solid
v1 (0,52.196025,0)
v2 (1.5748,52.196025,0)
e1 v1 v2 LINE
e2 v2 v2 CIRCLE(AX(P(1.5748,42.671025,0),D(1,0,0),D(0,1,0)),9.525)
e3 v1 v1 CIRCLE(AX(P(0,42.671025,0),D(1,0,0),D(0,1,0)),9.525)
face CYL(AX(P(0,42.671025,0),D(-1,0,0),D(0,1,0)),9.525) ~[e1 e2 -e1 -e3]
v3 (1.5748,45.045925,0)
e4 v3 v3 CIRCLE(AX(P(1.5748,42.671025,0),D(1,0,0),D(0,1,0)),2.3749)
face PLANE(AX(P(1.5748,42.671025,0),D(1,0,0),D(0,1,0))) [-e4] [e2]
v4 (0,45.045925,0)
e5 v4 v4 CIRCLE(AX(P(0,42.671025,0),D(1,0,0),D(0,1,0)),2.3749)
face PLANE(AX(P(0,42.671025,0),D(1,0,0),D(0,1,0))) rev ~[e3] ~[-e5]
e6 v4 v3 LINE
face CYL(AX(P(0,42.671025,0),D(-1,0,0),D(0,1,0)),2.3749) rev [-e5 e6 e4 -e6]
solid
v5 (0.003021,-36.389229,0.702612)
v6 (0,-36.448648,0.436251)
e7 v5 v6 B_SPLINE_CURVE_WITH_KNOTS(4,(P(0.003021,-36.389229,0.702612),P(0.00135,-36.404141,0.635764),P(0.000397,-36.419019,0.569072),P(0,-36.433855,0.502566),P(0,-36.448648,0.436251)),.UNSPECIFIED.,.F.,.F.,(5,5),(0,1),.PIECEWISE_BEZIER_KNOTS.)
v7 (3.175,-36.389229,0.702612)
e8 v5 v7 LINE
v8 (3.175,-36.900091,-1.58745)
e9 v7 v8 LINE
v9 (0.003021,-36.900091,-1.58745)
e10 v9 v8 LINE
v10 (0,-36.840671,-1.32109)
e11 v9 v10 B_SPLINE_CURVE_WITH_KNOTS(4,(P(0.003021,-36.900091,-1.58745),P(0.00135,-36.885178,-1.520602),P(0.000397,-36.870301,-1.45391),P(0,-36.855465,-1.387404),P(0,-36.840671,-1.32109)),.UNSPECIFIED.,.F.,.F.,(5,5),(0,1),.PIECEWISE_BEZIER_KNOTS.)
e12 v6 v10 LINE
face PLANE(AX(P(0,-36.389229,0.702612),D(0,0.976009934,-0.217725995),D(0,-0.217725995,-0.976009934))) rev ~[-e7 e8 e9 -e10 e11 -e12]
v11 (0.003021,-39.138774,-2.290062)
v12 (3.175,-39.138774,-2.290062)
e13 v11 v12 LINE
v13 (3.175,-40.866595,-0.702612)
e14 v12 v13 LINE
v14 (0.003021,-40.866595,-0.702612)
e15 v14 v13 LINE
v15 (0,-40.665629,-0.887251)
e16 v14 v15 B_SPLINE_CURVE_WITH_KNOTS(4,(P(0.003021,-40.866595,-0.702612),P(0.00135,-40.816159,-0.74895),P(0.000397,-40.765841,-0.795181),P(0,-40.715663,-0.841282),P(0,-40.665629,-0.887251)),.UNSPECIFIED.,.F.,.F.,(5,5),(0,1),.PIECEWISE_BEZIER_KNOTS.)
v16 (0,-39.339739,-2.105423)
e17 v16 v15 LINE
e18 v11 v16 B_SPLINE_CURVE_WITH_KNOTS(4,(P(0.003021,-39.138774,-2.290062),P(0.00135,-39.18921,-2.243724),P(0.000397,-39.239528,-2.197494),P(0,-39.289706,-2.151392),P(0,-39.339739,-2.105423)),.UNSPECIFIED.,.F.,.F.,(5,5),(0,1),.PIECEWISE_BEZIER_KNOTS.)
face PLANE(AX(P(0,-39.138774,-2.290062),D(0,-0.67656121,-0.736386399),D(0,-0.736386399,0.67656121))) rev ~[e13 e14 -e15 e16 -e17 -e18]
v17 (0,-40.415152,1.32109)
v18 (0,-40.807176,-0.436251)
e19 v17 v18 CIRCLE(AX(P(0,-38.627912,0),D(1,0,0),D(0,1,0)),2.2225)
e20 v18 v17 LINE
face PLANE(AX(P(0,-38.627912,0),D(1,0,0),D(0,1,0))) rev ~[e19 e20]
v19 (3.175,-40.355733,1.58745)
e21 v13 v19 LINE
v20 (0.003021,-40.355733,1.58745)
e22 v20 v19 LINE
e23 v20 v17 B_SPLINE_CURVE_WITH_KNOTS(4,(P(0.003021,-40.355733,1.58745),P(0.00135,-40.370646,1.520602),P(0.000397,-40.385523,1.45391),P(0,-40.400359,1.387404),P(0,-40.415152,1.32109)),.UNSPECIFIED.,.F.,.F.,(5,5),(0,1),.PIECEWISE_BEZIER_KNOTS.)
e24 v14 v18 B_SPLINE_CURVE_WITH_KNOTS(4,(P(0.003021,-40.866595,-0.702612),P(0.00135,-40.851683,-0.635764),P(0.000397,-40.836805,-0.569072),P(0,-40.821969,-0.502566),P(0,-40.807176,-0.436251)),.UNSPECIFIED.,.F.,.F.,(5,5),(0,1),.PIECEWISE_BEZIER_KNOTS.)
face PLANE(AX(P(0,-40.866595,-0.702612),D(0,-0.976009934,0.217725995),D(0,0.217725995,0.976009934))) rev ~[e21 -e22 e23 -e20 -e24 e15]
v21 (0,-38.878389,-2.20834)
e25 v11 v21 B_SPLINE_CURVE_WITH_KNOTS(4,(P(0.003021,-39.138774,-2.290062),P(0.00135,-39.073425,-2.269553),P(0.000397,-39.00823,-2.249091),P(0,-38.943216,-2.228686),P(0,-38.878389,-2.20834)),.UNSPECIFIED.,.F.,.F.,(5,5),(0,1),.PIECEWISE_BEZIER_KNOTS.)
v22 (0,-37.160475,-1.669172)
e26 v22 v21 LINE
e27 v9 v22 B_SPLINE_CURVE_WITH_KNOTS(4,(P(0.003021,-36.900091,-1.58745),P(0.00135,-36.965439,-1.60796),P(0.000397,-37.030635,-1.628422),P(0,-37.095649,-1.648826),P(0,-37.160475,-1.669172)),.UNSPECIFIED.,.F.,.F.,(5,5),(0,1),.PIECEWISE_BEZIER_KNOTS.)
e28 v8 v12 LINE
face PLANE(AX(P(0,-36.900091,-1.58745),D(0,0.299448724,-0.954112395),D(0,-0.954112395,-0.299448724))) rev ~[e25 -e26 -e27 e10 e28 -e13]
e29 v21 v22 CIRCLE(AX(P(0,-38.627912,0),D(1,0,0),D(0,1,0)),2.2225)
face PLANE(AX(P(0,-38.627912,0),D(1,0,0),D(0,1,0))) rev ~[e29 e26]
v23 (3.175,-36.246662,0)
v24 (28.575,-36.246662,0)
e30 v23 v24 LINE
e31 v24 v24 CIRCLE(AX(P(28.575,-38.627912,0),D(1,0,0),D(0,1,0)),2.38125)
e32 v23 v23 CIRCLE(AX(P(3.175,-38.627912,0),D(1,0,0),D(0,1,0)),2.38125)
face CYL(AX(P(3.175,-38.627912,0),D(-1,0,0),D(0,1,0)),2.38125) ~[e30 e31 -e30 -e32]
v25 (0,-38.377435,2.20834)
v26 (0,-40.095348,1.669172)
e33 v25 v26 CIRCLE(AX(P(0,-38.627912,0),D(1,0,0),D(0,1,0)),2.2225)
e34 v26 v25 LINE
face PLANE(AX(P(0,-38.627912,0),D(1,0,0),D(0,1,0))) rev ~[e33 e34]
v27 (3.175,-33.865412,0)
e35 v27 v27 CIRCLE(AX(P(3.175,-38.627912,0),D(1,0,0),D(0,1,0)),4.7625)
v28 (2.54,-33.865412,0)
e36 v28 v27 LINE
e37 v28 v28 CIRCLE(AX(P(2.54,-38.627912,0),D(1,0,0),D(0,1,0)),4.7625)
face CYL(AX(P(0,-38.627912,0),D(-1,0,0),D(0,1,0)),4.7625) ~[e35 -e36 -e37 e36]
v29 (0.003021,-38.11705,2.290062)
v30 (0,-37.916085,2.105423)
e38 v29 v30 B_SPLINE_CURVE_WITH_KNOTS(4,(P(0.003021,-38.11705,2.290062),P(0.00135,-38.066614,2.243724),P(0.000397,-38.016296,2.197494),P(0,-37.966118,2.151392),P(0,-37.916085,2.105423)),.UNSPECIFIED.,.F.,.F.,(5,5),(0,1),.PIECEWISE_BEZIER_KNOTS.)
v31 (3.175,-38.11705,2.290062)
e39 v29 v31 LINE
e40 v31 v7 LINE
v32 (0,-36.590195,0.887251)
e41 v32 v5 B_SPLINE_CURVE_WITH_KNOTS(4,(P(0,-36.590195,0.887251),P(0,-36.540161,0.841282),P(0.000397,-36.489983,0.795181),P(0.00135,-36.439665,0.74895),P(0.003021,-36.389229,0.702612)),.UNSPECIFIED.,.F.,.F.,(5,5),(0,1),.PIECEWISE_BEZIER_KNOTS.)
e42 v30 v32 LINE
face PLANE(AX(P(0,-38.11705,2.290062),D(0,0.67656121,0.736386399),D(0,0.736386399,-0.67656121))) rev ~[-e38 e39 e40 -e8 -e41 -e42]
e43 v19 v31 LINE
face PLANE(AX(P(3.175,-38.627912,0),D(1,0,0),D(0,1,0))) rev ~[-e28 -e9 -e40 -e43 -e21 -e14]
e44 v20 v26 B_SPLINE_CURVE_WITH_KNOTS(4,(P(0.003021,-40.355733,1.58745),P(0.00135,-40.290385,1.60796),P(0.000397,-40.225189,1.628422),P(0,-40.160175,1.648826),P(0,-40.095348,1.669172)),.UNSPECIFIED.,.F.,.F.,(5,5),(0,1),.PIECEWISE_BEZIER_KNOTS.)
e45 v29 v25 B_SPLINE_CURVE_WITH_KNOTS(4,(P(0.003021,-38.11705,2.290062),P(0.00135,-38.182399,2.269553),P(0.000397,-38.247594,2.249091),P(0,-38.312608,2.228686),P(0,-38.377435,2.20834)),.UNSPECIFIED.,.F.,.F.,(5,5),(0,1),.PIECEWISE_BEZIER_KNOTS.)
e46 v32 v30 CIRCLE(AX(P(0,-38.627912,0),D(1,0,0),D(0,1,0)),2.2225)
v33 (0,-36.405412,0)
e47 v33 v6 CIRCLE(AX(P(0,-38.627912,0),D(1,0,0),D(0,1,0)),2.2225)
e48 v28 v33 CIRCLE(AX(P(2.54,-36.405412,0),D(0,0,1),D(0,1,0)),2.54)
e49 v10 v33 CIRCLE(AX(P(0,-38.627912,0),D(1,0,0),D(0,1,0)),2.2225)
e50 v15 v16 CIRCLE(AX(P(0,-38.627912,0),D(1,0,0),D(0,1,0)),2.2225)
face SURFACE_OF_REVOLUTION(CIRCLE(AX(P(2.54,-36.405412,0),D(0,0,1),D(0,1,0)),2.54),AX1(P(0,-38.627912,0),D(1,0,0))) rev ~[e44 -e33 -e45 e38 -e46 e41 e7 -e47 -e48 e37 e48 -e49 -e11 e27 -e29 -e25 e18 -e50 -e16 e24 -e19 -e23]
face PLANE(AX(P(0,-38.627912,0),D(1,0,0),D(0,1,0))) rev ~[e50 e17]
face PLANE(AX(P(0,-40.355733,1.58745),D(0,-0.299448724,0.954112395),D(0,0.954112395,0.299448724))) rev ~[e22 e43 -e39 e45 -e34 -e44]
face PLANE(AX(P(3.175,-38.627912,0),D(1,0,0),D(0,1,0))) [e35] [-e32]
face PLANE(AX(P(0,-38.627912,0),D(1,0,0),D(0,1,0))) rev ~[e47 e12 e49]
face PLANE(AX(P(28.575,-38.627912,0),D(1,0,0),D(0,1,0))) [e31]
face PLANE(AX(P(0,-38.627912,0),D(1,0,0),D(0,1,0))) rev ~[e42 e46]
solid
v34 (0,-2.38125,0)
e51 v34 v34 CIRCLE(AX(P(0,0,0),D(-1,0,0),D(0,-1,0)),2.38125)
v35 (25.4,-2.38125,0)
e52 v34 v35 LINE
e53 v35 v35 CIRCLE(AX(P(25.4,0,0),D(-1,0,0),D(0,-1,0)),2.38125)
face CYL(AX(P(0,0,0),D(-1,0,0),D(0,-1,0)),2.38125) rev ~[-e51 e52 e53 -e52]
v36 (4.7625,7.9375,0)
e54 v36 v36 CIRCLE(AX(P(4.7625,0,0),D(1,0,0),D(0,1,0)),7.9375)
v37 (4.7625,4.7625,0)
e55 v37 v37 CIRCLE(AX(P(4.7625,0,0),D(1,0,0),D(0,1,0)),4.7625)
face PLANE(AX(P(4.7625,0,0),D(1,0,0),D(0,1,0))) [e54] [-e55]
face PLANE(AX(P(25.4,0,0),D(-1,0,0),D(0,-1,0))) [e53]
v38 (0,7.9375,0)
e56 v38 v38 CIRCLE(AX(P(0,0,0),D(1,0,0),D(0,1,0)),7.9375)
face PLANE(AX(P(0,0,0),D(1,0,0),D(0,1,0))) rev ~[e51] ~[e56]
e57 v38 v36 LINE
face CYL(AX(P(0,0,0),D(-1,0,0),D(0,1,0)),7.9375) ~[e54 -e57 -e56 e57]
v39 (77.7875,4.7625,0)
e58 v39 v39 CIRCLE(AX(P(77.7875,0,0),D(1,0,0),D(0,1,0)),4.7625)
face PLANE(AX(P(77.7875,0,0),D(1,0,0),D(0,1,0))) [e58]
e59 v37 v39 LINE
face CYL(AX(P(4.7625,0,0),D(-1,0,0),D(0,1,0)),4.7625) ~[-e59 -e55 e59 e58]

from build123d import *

# Parameters (mm, degrees)
F0_R      = 7.9375
F1_DEPTH  = 4.7625
F2_R      = 4.7625
F3_DEPTH  = 73.025
F4_R      = 2.38125
F5_DEPTH  = 25.4
F6_R      = 9.525
F6_R_2    = 2.3749
F7_DEPTH  = 1.5748
F8_R      = 4.7625
F9_DEPTH  = 3.175
F10_R     = 2.38125
F11_DEPTH = 25.4


# Not quite as in the source:
# - a fillet or chamfer that OpenCascade refuses, or shapes differently, is made with other operations: its cross-section is extruded or revolved along the edge and cut away or added


with BuildPart() as f1:
    # F0 (on Right) → F1 (new body)
    with BuildSketch(Plane.YZ):
        Circle(F0_R)
    extrude(amount=F1_DEPTH)

    # F2 (on face) → F3 (join)
    with BuildSketch(Plane.YZ.offset(4.7625)):
        Circle(F2_R)
    extrude(amount=F3_DEPTH)

    # F4 (on face) → F5 (cut)
    with BuildSketch(Plane(origin=(0, 0, 0), x_dir=(0, -1, 0), z_dir=(-1, 0, 0))):
        Circle(F4_R)
    extrude(amount=-F5_DEPTH, mode=Mode.SUBTRACT)


with BuildPart() as f7:
    # F6 (on Right) → F7 (new body)
    with BuildSketch(Plane.YZ):
        with Locations((42.671024815, 0)):
            Circle(F6_R)
        with Locations((42.671024815, 0)):
            Circle(F6_R_2, mode=Mode.SUBTRACT)
    extrude(amount=F7_DEPTH)


with BuildPart() as f9:
    # F8 (on Right) → F9 (new body)
    with BuildSketch(Plane.YZ):
        with Locations((-38.6279119517, 0)):
            Circle(F8_R)
        Polygon((-36.9000906235, -1.5874504059), (-39.1387736664, -2.2900623664), (-40.8665949945, -0.7026119604), (-40.3557332798, 1.5874504059), (-38.117050237, 2.2900623664), (-36.3892289088, 0.7026119604), align=None, mode=Mode.SUBTRACT)
    extrude(amount=F9_DEPTH)

    # F10 (on face) → F11 (join)
    with BuildSketch(Plane.YZ.offset(3.175)):
        with Locations((-38.6279119517, 0)):
            Circle(F10_R)
        Polygon((-40.3557332798, 1.5874504059), (-38.117050237, 2.2900623664), (-36.3892289088, 0.7026119604), (-36.9000906235, -1.5874504059), (-39.1387736664, -2.2900623664), (-40.8665949945, -0.7026119604), align=None, mode=Mode.SUBTRACT)
        Polygon((-36.3892289088, 0.7026119604), (-38.117050237, 2.2900623664), (-40.3557332798, 1.5874504059), (-40.8665949945, -0.7026119604), (-39.1387736664, -2.2900623664), (-36.9000906235, -1.5874504059), align=None)
    extrude(amount=F11_DEPTH)

    # F12: fillet of radius 2.54 on 1 edges, made by hand

    # F12_s1 → F12_t2 (revolve, cut)
    with BuildSketch(Plane.XY):
        with BuildLine():
            ThreePointArc((2.54, -33.8654119517), (0.7439487758, -34.6093607275), (0, -36.4054119517))
            Line((0, -36.4054119517), (0, -33.8654119517))
            Line((0, -33.8654119517), (2.54, -33.8654119517))
        make_face()
    revolve(axis=Axis((0, -38.6279119517, 0), (1, 0, 0)), mode=Mode.SUBTRACT)


solid = Compound([f1.part, f7.part, f9.part])
